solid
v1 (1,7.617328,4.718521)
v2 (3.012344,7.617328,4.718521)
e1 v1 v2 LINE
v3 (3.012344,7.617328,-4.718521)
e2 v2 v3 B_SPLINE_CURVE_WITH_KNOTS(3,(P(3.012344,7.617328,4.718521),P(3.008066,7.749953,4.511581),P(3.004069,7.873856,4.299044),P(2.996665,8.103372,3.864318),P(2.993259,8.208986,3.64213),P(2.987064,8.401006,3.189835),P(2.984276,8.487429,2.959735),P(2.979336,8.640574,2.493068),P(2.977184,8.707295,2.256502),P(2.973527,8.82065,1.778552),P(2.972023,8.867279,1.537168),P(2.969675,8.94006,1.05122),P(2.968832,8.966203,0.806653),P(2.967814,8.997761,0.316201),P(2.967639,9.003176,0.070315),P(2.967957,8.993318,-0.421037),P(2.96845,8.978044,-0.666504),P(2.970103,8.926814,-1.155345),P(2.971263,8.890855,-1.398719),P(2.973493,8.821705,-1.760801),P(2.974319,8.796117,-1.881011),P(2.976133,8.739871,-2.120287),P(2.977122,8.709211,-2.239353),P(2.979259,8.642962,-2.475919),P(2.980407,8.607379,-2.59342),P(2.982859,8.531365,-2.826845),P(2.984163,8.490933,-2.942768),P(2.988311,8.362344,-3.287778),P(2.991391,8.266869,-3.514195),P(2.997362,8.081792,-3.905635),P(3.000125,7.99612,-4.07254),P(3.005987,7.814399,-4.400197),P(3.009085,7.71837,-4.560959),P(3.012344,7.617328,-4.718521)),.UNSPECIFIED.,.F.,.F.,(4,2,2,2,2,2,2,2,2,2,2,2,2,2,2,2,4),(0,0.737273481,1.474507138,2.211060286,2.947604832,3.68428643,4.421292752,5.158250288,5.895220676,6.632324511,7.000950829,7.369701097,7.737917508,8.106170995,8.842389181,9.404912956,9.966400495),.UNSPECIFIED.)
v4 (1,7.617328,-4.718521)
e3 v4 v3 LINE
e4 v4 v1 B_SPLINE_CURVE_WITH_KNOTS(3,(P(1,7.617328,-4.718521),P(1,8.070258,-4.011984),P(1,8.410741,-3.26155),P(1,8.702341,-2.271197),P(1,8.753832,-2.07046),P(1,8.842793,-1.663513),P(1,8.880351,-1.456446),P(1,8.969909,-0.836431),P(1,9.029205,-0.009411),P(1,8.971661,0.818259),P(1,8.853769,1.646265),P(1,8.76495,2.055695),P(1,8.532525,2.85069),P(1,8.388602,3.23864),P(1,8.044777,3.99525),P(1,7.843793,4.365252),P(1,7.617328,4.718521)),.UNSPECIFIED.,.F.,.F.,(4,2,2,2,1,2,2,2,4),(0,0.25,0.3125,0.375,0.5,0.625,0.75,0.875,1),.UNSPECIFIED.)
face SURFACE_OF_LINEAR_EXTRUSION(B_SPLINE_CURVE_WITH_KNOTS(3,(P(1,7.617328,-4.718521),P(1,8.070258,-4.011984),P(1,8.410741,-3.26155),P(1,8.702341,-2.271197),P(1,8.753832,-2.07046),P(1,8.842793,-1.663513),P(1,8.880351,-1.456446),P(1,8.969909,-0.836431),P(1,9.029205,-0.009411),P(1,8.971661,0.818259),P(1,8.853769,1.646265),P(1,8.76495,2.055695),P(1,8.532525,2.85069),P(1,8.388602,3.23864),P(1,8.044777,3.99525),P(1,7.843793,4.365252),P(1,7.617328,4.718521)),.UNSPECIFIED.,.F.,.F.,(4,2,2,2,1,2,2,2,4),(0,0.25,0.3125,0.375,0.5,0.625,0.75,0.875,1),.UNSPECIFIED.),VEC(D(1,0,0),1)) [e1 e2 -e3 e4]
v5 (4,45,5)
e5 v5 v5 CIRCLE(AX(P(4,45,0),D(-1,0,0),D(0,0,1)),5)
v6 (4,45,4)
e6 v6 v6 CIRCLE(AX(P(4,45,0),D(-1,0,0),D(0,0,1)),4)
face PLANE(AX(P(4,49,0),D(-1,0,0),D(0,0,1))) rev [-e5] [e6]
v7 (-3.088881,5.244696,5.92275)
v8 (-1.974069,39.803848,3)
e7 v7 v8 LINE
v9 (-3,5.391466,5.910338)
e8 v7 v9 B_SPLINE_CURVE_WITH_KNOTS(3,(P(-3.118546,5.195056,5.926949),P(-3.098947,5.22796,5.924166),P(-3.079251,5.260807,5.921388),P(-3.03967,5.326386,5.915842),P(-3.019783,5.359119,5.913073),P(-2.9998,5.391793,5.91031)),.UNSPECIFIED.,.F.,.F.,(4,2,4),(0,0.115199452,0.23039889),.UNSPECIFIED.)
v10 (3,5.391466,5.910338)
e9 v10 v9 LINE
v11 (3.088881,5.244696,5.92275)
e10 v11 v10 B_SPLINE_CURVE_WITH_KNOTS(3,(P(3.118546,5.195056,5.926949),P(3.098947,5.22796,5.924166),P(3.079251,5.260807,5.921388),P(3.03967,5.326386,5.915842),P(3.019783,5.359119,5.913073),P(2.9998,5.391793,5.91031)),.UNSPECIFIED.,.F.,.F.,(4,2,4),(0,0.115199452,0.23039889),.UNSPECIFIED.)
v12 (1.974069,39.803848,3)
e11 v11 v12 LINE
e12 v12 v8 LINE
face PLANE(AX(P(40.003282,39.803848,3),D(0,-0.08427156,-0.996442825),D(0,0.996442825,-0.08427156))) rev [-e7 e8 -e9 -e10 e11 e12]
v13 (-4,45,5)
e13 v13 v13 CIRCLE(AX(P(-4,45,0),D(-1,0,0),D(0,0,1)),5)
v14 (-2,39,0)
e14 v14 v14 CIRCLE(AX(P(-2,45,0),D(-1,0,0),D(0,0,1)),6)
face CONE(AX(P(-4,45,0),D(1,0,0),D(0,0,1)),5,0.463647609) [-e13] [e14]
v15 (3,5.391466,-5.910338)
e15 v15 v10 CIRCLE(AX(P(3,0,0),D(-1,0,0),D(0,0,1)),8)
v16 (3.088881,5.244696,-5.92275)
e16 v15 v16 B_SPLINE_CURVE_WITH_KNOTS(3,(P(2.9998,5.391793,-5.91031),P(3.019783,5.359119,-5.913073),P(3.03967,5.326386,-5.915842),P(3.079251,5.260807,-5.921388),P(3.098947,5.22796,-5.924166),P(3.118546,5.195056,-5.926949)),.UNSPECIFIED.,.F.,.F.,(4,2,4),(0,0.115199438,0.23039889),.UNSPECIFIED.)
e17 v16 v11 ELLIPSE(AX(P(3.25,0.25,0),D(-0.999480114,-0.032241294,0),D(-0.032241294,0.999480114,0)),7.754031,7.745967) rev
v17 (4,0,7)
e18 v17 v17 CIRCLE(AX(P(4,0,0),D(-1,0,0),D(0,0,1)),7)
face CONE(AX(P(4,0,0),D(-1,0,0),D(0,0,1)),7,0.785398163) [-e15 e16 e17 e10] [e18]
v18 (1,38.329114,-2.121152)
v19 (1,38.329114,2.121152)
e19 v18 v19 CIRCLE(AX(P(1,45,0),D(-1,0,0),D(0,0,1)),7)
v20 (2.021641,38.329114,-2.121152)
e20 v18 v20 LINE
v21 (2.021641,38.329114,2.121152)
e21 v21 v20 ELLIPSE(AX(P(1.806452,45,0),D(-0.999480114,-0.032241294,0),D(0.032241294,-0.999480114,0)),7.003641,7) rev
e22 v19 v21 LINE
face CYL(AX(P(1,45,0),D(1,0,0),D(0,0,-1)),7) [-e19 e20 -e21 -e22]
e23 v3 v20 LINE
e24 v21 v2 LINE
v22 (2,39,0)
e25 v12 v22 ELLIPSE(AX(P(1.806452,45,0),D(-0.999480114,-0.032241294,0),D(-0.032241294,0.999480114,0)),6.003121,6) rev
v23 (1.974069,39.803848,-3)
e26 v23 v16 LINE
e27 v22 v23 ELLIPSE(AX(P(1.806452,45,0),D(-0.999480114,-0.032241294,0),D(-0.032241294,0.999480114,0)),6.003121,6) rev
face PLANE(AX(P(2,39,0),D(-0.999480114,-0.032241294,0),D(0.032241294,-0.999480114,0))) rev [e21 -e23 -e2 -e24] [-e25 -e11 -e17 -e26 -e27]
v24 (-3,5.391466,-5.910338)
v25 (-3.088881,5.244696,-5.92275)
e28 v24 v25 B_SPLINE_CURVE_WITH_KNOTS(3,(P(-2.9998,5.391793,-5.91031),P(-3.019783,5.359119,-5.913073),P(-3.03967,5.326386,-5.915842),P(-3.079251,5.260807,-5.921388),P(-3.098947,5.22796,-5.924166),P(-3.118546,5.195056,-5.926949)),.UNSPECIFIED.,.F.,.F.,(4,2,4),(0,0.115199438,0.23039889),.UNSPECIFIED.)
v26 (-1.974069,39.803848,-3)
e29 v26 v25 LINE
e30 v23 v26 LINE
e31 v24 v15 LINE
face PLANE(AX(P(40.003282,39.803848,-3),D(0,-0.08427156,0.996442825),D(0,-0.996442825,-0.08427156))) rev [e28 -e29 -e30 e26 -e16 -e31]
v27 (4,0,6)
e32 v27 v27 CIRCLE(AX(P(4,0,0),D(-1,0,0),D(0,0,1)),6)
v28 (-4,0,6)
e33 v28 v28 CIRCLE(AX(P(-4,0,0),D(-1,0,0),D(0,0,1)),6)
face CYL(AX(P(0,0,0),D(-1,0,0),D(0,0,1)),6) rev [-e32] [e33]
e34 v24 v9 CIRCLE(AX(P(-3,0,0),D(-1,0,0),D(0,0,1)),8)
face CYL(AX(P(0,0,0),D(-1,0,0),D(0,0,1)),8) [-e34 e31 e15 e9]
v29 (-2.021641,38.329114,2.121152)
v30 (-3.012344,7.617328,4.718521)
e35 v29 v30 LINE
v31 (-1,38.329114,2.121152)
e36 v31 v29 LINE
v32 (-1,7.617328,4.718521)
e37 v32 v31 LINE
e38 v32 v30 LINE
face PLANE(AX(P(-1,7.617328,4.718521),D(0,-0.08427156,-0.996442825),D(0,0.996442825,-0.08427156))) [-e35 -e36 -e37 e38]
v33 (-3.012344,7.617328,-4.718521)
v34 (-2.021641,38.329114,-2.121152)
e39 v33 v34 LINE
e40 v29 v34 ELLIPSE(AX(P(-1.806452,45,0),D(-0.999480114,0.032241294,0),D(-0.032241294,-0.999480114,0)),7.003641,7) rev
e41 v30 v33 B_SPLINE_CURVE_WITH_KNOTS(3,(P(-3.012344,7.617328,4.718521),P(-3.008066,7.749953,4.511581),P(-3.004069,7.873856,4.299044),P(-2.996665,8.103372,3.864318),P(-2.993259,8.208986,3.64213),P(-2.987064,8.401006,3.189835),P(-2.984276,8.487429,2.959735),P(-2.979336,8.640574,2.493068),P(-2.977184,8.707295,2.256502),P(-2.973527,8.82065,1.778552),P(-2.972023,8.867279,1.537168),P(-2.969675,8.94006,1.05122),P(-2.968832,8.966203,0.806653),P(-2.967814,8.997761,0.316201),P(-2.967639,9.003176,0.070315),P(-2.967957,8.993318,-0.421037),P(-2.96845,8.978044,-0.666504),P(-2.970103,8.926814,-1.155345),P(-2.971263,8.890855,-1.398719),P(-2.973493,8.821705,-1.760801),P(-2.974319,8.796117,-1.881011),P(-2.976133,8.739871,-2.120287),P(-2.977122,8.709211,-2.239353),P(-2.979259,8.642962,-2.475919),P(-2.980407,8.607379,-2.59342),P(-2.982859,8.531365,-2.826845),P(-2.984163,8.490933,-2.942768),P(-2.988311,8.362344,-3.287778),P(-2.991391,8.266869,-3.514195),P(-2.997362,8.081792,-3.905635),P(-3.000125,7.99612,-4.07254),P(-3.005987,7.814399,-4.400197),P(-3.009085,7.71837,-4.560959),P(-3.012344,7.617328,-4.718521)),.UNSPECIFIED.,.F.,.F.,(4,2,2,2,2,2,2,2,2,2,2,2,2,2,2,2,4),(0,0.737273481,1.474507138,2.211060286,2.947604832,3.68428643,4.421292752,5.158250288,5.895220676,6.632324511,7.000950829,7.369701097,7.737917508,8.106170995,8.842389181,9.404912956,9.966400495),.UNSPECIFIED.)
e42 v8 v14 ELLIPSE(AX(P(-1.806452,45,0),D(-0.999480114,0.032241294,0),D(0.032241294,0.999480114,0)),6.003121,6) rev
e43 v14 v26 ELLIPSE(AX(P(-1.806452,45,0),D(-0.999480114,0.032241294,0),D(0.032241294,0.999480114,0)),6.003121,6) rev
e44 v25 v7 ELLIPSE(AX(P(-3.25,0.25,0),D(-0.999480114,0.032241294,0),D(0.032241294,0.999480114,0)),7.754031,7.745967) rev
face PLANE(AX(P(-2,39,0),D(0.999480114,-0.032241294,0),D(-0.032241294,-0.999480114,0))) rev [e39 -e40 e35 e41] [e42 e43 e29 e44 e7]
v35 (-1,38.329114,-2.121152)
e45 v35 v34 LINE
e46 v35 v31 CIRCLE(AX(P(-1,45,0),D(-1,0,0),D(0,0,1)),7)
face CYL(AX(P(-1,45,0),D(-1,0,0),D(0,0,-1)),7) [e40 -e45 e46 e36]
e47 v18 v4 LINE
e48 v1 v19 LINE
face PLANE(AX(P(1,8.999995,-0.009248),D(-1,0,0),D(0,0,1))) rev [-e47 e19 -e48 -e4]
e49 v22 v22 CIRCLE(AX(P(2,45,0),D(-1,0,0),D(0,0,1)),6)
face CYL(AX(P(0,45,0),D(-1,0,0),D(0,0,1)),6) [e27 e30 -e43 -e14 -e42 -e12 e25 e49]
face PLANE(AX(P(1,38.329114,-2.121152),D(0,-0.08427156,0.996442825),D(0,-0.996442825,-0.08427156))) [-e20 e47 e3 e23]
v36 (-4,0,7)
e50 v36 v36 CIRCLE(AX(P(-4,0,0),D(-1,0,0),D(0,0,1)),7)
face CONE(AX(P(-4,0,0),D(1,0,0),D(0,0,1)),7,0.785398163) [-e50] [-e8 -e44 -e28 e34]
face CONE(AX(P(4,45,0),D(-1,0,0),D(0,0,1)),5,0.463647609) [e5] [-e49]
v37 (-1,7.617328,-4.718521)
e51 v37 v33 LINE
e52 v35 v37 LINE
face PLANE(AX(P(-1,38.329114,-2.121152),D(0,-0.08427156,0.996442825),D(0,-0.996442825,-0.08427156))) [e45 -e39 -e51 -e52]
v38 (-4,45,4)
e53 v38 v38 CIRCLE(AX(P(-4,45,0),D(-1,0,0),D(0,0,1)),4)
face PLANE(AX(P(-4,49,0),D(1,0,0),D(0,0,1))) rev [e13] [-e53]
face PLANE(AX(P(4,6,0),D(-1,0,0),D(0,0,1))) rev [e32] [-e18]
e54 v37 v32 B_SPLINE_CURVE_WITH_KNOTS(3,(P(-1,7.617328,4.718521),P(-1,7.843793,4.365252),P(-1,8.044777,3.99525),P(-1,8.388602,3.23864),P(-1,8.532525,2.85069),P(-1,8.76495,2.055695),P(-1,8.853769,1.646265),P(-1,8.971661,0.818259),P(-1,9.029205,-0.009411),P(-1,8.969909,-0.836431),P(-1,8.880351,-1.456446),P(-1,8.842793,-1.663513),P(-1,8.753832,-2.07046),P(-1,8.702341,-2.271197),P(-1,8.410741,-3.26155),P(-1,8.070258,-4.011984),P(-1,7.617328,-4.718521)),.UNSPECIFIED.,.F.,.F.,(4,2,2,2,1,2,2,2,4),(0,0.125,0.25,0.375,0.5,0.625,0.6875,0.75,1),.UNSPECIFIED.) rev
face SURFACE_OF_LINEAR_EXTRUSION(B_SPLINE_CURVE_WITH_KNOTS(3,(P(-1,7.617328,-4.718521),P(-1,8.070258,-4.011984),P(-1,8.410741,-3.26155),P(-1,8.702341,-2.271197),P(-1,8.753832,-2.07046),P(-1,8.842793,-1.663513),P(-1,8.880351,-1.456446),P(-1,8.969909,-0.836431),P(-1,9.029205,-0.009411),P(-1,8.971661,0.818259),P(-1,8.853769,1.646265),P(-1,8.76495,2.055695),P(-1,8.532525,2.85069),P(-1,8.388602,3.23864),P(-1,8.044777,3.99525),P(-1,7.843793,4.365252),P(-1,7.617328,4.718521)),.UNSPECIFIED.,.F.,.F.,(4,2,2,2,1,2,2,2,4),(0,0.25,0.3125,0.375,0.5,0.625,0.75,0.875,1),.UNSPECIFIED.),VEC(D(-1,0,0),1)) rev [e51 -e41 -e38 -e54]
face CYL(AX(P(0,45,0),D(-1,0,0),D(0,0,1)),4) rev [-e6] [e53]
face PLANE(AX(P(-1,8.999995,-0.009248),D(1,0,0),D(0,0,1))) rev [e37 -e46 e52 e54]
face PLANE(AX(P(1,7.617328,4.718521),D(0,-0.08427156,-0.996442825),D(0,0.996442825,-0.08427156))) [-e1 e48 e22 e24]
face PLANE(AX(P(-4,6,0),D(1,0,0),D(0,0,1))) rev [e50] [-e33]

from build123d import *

# Parameters (mm, degrees)
BOSS_EXTRU_1_DEPTH      = 2.0000001
BOSS_EXTRU_1_START      = 2.0000001
BOSS_EXTRU_1_2_DEPTH    = 1.088880676
BOSS_EXTRU_1_START_2    = 3.256370695
BOSS_EXTRU_1_3_DEPTH    = 1.743629305
BOSS_EXTRU_1_START_3    = 3.172268194
BOSS_EXTRU_1_4_DEPTH    = 0.084102501
ENL_V_MAT_EXTRU_1_DEPTH = 9


with BuildPart() as part:
    # Esquisse5 → Révolution4 (revolve)
    with BuildSketch(Plane.XY, mode=Mode.PRIVATE) as r_volution4_sk:
        Polygon((0, 51), (2.4e-16, 48.99999999999999), (4, 48.99999999999999), (4, 49.99999999999999), (2, 51), align=None)
    revolve(r_volution4_sk.sketch.rotate(Axis((0, 45, 0), (1, 0, 0)), 90), axis=Axis((0, 45, 0), (1, 0, 0)))



with BuildPart() as body_2:
    # Esquisse1 → Révolution5 (revolve)
    with BuildSketch(Plane.XY, mode=Mode.PRIVATE) as r_volution5_sk:
        Polygon((0, 8), (2.4e-16, 6), (4, 6), (4, 7), (3, 8), align=None)
    revolve(r_volution5_sk.sketch.rotate(Axis((0, 0, 0), (1, 0, 0)), 90), axis=Axis((0, 0, 0), (1, 0, 0)))


with BuildPart() as part_1:
    add(part.part)

    add(body_2.part)  # Boss.-Extru.1 merges body 2
    # Boss.-Extru.1: read off the stored shape, not the designer's step
    # Boss.-Extru.1 outline → Boss.-Extru.1 (add)
    with BuildSketch(Plane(origin=(0, 0, 0), x_dir=(0, 0, -1), z_dir=(1, 0, 0))):
        with BuildLine():
            Line((5.910337632, 5.39146632), (3, 39.803847577))
            ThreePointArc((3, 39.803847577), (0, 39), (-3, 39.803847577))
            Line((-3, 39.803847577), (-5.910337632, 5.39146632))
            ThreePointArc((-5.910337632, 5.39146632), (0, 8), (5.910337632, 5.39146632))
        make_face()
    extrude(amount=BOSS_EXTRU_1_DEPTH)

    # Boss.-Extru.1 2 outline → Boss.-Extru.1 2 (add)
    with BuildSketch(Plane.YZ.offset(BOSS_EXTRU_1_START)):
        with BuildLine():
            Line((5.39146632, -5.910337632), (39.803847577, -3))
            ThreePointArc((39.803847577, -3), (39, 0), (39.803847577, 3))
            Line((39.803847577, 3), (5.39146632, 5.910337632))
            ThreePointArc((5.39146632, 5.910337632), (8, 0), (5.39146632, -5.910337632))
        make_face()
    extrude(amount=BOSS_EXTRU_1_2_DEPTH)

    # Boss.-Extru.1 3 outline → Boss.-Extru.1 3 (cut)
    with BuildSketch(Plane(origin=(0, 0, 0), x_dir=(-0.03224129401095809, 0.9994801143396995, 0), z_dir=(0.9994801143396996, 0.03224129401095809, 0)).offset(BOSS_EXTRU_1_START_2)):
        with BuildLine():
            add(Edge.make_bspline(
                [(39.719507575, -3), (39.40876316904248, -2.4620547166991815), (39.162117173894806, -1.8742292038543285), (38.995705810616926, -1.2534964190781621), (38.915241871226364, -0.6211657082460549), (38.915241871226335, 0.6211657082460427), (38.995705810617025, 1.2534964190781435), (39.16211717389472, 1.87422920385429), (39.408763169042494, 2.4620547166991438), (39.719507575, 3)],
                knots=[2.6179938779914917, 2.6179938779914917, 2.6179938779914917, 2.6179938779914917, 2.6179938779914917, 2.6179938779914917, 3.141592653589793, 3.141592653589793, 3.141592653589793, 3.141592653589793, 3.6651914291880856, 3.6651914291880856, 3.6651914291880856, 3.6651914291880856, 3.6651914291880856, 3.6651914291880856], degree=5, weights=[1, 0.9999999999999999, 0.9995355802743661, 0.9995355802743694, 0.9999999999999987, 0.9999999999999997, 0.9995355802743684, 0.9995355802743646, 1.000000000000001, 1]))
            Line((39.719507575, 3), (5.142379796, 5.922750354))
            add(Edge.make_bspline(
                [(5.142379796, 5.922750354), (12.176597342754391, 2.94e-15), (5.142379796, -5.922750354)],
                knots=[5.4127279348930895, 5.4127279348930895, 5.4127279348930895, 7.153642679466082, 7.153642679466082, 7.153642679466082], degree=2, weights=[1, 0.6444768969331859, 1]))
            Line((5.142379796, -5.922750354), (39.719507575, -3))
        make_face()
    extrude(amount=BOSS_EXTRU_1_3_DEPTH, mode=Mode.SUBTRACT)

    # Boss.-Extru.1 4 outline → Boss.-Extru.1 4 (add)
    with BuildSketch(Plane(origin=(0, 0, 0), x_dir=(-0.03224129401095809, 0.9994801143396995, 0), z_dir=(0.9994801143396996, 0.03224129401095809, 0)).offset(BOSS_EXTRU_1_START_3)):
        with BuildLine():
            add(Edge.make_bspline(
                [(39.719507575, -3), (39.40876316904248, -2.4620547166991815), (39.162117173894806, -1.8742292038543285), (38.995705810616926, -1.2534964190781621), (38.915241871226364, -0.6211657082460549), (38.915241871226335, 0.6211657082460427), (38.995705810617025, 1.2534964190781435), (39.16211717389472, 1.87422920385429), (39.408763169042494, 2.4620547166991438), (39.719507575, 3)],
                knots=[2.6179938779914917, 2.6179938779914917, 2.6179938779914917, 2.6179938779914917, 2.6179938779914917, 2.6179938779914917, 3.141592653589793, 3.141592653589793, 3.141592653589793, 3.141592653589793, 3.6651914291880856, 3.6651914291880856, 3.6651914291880856, 3.6651914291880856, 3.6651914291880856, 3.6651914291880856], degree=5, weights=[1, 0.9999999999999999, 0.9995355802743661, 0.9995355802743694, 0.9999999999999987, 0.9999999999999997, 0.9995355802743684, 0.9995355802743646, 1.000000000000001, 1]))
            Line((39.719507575, 3), (5.142379796, 5.922750354))
            add(Edge.make_bspline(
                [(5.142379796, 5.922750354), (12.176597342754391, 2.94e-15), (5.142379796, -5.922750354)],
                knots=[5.4127279348930895, 5.4127279348930895, 5.4127279348930895, 7.153642679466082, 7.153642679466082, 7.153642679466082], degree=2, weights=[1, 0.6444768969331859, 1]))
            Line((5.142379796, -5.922750354), (39.719507575, -3))
        make_face()
    extrude(amount=BOSS_EXTRU_1_4_DEPTH)

    # Esquisse9 → Enlèv. mat.-Extru.1 (cut)
    with BuildSketch(Plane.ZY.offset(-10)):
        with BuildLine():
            Line((4.718521323912527, 7.617327682628817), (2.1211518499967568, 38.329114389434075))
            ThreePointArc((2.1211518499967568, 38.329114389434075), (1.073266212558332, 38.08276792083852), (1.29e-15, 38))
            ThreePointArc((1.29e-15, 38), (-1.073266212558333, 38.08276792083852), (-2.121151849996758, 38.32911438943409))
            Line((-2.121151849996758, 38.32911438943409), (-4.7185213239117045, 7.617327682628745))
            add(Edge.make_bspline(
                [(-4.7185213239117045, 7.617327682628745), (-4.011984255343939, 8.07025795693203), (-3.261550361542695, 8.410740591888102), (-2.271196708651888, 8.702341470829108), (-2.0704598676815396, 8.75383204519997), (-1.6635130029960707, 8.84279289802945), (-1.4564460321419168, 8.880350619711342), (-0.8364313606849374, 8.969908948596252), (-0.00941084225722296, 9.029205401703821), (0.8182594148600882, 8.971660679545407), (1.6462652533968807, 8.85376903934497), (2.0556953800959636, 8.764949997544292), (2.8506904444171615, 8.532525136333405), (3.238639754796587, 8.388601680371801), (3.9952504696443545, 8.044777052176356), (4.365252036804484, 7.843793302383422), (4.718521323912527, 7.617327682628817)],
                knots=[0, 0, 0, 0, 0.2499999999999994, 0.2499999999999994, 0.31249999999999933, 0.31249999999999933, 0.37499999999999933, 0.37499999999999933, 0.49999999999999944, 0.6249999999999996, 0.6249999999999996, 0.7499999999999997, 0.7499999999999997, 0.8749999999999999, 0.8749999999999999, 1, 1, 1, 1], degree=3))
        make_face()
    extrude(amount=ENL_V_MAT_EXTRU_1_DEPTH, mode=Mode.SUBTRACT)

    # Symétrie1: part across face


with BuildPart() as part_2:
    add(part_1.part)
    add(part_1.part.mirror(Plane(origin=(0, 20.598769337, 0), x_dir=(0, 0, 1), z_dir=(-1, 0, 0))))


solid = part_2.part
